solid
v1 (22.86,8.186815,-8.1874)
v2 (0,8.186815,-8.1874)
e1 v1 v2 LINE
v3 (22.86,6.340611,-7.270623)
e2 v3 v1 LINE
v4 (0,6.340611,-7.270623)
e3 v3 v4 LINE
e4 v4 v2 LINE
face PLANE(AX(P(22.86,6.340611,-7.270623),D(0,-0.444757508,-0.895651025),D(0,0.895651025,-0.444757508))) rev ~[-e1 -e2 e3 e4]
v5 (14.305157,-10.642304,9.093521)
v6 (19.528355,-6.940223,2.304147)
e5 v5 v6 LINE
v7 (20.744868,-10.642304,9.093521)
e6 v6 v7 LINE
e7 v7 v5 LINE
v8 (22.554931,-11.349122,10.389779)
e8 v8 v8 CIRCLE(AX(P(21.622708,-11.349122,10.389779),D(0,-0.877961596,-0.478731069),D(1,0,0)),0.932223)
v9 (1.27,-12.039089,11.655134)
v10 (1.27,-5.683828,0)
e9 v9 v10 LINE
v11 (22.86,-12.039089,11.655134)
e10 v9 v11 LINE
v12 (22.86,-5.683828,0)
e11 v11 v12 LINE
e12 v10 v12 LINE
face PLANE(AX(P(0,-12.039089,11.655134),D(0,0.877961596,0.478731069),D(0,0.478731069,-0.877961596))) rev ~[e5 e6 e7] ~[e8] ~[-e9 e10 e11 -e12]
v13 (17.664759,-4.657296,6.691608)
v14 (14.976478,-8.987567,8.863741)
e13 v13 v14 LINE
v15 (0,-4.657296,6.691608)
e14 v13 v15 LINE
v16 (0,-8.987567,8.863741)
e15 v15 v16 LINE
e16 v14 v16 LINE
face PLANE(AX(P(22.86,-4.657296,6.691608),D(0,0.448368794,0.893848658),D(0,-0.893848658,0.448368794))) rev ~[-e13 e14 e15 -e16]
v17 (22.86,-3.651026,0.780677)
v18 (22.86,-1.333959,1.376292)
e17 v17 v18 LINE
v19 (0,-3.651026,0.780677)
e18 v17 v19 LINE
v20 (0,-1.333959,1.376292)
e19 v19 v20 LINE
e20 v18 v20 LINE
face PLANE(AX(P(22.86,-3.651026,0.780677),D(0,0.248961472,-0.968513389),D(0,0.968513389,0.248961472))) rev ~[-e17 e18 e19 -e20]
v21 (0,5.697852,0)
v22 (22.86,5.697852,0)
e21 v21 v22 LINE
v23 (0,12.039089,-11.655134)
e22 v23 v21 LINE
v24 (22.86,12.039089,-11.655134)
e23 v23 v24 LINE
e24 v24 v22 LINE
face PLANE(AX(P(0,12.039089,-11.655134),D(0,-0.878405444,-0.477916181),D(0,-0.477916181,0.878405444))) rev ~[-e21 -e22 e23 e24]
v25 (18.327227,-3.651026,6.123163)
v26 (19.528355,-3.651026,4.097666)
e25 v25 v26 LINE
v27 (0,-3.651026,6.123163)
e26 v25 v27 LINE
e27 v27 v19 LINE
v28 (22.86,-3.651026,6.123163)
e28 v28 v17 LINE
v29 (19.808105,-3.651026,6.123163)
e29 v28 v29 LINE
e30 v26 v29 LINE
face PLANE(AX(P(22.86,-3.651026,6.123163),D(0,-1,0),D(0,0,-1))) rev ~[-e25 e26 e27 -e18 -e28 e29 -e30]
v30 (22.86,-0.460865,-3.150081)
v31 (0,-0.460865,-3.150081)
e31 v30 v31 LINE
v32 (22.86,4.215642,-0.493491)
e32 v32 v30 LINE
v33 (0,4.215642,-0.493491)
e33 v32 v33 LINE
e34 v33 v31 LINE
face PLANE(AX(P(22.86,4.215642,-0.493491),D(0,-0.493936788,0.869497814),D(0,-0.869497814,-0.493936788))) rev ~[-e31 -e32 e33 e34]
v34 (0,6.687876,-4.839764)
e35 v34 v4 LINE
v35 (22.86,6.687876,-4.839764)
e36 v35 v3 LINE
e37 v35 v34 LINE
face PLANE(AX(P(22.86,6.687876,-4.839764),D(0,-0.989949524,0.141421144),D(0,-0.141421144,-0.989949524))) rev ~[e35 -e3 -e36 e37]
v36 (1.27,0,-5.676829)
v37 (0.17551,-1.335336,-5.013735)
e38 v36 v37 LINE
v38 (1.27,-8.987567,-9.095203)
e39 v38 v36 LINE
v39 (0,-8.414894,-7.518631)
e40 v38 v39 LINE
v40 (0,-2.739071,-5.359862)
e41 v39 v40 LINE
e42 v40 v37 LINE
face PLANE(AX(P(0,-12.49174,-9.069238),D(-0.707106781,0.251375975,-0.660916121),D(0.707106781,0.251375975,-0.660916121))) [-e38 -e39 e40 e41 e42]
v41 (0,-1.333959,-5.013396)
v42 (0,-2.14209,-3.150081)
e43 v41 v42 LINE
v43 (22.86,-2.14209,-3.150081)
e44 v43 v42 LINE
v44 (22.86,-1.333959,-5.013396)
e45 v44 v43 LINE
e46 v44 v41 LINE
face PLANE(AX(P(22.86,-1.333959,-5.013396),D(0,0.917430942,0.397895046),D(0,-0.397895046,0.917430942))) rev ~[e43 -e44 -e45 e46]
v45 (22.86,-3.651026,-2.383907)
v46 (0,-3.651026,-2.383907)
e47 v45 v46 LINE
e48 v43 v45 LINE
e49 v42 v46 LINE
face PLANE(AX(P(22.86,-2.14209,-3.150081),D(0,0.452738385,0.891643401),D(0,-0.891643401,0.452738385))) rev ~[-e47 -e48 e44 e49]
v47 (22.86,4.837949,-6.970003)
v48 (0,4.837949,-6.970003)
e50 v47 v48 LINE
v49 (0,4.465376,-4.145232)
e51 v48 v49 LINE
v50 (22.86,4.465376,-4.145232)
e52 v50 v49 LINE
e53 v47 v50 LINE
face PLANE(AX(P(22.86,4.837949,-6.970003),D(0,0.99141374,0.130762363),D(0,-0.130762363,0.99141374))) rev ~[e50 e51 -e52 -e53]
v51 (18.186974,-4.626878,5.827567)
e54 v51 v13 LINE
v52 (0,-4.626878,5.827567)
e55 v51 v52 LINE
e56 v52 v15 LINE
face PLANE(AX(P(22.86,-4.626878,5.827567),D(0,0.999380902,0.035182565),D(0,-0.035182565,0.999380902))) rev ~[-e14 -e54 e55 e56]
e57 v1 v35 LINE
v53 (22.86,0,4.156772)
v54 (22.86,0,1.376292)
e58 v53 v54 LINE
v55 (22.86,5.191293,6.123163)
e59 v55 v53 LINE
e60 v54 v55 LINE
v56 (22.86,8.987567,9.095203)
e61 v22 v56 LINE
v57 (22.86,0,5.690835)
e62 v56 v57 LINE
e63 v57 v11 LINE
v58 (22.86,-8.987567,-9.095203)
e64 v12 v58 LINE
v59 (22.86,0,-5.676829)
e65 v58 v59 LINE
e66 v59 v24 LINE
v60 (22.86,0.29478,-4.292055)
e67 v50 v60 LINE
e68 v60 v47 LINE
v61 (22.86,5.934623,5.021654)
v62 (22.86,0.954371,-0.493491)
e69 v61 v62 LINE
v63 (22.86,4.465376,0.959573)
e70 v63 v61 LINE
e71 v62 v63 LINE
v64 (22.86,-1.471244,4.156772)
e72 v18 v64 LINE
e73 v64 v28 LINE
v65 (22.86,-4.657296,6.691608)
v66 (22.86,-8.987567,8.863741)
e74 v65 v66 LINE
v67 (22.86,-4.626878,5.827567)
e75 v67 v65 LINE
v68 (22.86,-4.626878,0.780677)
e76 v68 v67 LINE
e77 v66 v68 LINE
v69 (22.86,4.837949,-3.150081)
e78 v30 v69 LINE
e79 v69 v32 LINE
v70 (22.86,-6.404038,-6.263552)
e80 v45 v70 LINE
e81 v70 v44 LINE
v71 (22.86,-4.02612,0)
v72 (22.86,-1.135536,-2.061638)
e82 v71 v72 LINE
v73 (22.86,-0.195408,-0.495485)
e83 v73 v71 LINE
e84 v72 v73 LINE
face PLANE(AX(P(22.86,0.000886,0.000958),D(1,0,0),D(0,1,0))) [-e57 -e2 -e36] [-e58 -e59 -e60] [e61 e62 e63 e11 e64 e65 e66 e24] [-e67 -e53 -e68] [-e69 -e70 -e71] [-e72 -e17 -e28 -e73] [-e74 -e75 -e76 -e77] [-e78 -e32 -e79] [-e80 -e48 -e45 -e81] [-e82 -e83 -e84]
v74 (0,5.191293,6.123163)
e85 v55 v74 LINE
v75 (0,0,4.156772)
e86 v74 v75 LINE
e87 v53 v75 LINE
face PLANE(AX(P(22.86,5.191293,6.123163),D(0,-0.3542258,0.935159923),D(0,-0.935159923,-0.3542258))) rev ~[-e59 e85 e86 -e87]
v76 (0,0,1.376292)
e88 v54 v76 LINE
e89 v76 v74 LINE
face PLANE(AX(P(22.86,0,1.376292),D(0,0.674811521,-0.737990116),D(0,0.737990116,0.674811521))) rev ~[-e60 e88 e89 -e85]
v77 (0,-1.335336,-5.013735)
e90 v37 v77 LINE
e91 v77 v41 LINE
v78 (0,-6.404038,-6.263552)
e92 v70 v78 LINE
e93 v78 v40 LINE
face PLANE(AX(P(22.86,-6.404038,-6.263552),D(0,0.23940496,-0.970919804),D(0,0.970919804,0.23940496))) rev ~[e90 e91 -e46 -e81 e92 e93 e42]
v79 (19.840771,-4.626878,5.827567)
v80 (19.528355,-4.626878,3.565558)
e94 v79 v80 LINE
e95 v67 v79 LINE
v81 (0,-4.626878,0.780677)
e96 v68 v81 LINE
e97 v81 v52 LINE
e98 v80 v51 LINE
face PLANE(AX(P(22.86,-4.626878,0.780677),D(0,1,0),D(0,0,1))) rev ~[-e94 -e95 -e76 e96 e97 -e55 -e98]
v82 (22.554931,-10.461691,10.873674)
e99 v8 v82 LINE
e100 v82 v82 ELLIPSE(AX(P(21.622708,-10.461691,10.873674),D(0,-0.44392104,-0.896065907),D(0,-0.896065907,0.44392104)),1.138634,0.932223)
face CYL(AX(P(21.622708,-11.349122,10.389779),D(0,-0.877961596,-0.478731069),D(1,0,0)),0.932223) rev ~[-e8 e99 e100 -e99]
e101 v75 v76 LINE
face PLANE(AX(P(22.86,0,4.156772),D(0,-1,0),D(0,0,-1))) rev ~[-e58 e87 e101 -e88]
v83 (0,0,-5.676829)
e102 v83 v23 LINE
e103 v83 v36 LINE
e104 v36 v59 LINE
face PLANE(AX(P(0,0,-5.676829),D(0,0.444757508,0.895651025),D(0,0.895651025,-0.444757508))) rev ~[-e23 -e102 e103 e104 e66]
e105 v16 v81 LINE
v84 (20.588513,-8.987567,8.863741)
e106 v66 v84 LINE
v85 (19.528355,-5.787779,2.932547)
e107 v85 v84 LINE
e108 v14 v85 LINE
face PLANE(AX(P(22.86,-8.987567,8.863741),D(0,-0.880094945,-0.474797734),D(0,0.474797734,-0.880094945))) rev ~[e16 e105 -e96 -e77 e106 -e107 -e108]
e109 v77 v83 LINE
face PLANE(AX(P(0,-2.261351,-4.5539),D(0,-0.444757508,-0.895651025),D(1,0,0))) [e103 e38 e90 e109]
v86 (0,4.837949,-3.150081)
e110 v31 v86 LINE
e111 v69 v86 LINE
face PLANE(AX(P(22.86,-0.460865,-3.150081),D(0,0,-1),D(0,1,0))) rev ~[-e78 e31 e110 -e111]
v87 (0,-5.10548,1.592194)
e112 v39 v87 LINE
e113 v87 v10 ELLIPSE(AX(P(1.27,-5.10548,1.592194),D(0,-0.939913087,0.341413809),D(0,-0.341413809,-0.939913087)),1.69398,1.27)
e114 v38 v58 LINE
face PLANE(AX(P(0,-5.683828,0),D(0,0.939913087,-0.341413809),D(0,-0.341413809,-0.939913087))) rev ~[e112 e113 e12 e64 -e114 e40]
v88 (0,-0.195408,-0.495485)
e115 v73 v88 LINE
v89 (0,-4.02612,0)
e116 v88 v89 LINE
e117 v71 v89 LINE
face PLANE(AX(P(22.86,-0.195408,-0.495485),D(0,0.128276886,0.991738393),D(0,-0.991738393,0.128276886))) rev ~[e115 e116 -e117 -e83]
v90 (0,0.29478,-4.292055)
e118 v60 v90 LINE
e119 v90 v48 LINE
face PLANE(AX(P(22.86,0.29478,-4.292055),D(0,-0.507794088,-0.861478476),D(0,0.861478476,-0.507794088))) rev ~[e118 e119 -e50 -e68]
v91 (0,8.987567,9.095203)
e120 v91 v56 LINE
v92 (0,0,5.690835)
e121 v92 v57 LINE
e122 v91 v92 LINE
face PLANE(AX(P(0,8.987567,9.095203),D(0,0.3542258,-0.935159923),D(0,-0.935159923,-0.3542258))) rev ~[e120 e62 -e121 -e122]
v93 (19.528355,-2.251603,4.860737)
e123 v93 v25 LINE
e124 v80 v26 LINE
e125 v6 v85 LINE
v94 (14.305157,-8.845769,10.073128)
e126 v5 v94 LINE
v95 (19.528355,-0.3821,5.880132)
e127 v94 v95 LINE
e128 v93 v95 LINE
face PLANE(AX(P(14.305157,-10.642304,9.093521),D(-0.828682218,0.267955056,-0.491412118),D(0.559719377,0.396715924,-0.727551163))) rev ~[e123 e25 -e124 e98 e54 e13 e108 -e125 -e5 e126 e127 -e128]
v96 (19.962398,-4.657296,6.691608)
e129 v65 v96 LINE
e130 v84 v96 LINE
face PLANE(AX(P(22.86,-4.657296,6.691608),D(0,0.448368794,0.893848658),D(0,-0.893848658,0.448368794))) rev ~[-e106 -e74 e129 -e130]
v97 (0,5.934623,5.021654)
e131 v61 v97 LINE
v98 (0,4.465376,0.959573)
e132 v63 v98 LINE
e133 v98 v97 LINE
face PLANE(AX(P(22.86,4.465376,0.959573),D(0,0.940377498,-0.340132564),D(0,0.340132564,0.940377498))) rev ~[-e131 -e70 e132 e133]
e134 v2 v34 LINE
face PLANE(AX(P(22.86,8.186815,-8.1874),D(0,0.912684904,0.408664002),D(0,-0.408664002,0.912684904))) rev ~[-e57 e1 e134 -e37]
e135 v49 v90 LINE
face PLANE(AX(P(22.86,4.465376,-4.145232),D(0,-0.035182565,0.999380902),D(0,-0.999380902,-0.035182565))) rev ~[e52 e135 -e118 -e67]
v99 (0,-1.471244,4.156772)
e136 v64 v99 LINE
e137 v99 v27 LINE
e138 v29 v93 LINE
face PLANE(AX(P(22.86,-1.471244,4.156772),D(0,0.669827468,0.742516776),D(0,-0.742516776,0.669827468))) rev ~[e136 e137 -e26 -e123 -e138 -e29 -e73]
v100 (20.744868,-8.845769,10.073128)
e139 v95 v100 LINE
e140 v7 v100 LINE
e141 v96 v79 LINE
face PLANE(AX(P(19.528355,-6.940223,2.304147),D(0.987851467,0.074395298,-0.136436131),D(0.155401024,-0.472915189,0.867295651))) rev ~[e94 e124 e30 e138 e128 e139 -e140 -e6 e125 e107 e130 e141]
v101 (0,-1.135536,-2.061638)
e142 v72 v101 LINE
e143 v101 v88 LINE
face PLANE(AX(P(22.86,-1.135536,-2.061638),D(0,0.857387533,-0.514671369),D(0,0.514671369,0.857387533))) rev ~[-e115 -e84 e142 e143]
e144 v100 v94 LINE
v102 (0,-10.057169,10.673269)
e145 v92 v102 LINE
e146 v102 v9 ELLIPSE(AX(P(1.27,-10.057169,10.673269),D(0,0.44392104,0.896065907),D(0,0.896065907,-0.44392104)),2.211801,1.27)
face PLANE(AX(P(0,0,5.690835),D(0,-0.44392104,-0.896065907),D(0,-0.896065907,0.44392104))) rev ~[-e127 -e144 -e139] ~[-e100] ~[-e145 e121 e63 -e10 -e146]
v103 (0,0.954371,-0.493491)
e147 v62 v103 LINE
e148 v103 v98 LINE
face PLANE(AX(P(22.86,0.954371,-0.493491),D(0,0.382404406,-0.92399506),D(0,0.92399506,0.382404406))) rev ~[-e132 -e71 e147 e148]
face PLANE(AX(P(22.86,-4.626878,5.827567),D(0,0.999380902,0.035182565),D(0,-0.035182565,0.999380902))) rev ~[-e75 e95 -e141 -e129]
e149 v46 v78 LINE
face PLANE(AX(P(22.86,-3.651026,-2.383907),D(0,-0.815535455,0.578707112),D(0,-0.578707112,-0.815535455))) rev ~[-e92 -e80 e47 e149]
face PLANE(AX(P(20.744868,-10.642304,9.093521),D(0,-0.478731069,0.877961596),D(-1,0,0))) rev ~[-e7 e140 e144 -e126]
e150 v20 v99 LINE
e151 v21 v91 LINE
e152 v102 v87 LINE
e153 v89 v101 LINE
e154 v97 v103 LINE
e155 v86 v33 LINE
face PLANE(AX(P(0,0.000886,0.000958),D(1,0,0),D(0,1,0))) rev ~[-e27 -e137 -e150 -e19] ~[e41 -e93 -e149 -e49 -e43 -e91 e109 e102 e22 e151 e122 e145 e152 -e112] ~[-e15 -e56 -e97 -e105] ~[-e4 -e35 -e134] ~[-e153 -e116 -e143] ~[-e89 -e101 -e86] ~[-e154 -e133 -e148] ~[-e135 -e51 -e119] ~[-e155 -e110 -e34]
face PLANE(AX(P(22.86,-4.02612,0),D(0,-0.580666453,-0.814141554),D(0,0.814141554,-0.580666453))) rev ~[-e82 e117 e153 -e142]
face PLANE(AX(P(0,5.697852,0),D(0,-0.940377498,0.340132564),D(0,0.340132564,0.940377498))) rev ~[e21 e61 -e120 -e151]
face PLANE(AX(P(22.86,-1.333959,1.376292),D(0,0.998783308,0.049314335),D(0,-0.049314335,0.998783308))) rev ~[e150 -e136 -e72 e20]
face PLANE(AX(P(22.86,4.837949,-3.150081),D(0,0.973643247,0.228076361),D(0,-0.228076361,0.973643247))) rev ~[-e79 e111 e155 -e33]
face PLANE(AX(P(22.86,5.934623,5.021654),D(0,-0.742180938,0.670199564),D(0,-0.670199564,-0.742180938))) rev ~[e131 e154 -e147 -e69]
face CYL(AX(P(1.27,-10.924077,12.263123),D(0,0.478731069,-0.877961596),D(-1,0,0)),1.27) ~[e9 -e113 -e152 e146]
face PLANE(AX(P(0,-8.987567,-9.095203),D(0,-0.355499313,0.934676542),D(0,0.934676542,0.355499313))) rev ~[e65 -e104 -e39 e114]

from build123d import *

# Parameters (mm, degrees)
F1_DEPTH    = 22.86
F3_DEPTH    = 22.861
F5_DEPTH    = 21.1407149532
F6_R        = 0.9322227143
F7_DEPTH    = 21.1407149532
F8_R        = 1.27
F9_T4_DEPTH = 16.1477728221


# Not quite as in the source:
# - a fillet or chamfer that OpenCascade refuses, or shapes differently, is made with other operations: its cross-section is extruded or revolved along the edge and cut away or added
# - a feature names something its author has since deleted; it is built from what else it names


with BuildPart() as f1:
    # F0 (on Right) → F1 (new body)
    with BuildSketch(Plane.YZ):
        Polygon((0, 5.6908354163), (-12.0390886441, 11.6551341489), (-5.6838279371, 0), (-8.9875673875, -9.0952031314), (0, -5.6768290866), (12.0390886441, -11.6551341489), (5.6978515349, 0), (8.9875673875, 9.0952031314), align=None)
    extrude(amount=F1_DEPTH)

    # F2 (on face) → F3 (cut, through all)
    with BuildSketch(Plane.YZ.offset(22.86)):
        Polygon((0.2947798819, -4.2920547475), (4.8379492509, -6.9700027277), (4.4653764926, -4.1452315636), align=None)
        Polygon((-0.460864554, -3.1500807424), (4.8379492509, -3.1500807424), (4.2156420195, -0.4934913878), align=None)
        Polygon((-6.4040375873, -6.2635522336), (-1.3339594007, -5.0133955665), (-2.1420896955, -3.1500807424), (-3.6510264616, -2.3839071877), align=None)
        Polygon((-3.6510264616, 0.7806772021), (-1.3339594007, 1.3762915041), (-1.4712439905, 4.1567722153), (-3.6510264616, 6.1231630373), align=None)
        Polygon((-8.9875673875, 8.8637409893), (-4.6268783625, 0.7806772021), (-4.6268783625, 5.8275670744), (-4.6572963607, 6.6916077305), align=None)
        Polygon((0.9543706066, -0.4934913878), (4.4653764926, 0.9595727897), (5.9346228684, 5.0216543911), align=None)
        Polygon((0, 1.3762915041), (5.1912929219, 6.1231630373), (0, 4.1567722153), align=None)
        Polygon((-0.1954076109, -0.4954853684), (-4.0261200629, 0), (-1.1355356546, -2.0616382826), align=None)
        Polygon((8.1868149158, -8.1874002878), (6.6878763027, -4.839763511), (6.3406112604, -7.2706225328), align=None)
    extrude(amount=-F3_DEPTH, mode=Mode.SUBTRACT)

    # F4 (on face) → F5 (cut, through all)
    with BuildSketch(Plane(origin=(0, -4.381188718, -2.3889554726), x_dir=(1, 0, 0), z_dir=(0, -0.8779615957, -0.4787310691))):
        Polygon((20.7448676229, 13.0785638466), (14.3051566556, 13.0785638466), (19.5283554494, 5.3454530425), align=None)
    extrude(amount=-F5_DEPTH, mode=Mode.SUBTRACT)

    # F6 (on face) → F7 (cut, through all)
    with BuildSketch(Plane(origin=(0, -4.381188718, -2.3889554726), x_dir=(1, 0, 0), z_dir=(0, -0.8779615957, -0.4787310691))):
        with Locations((21.6227080673, 14.5550044253)):
            Circle(F6_R)
    extrude(amount=-F7_DEPTH, mode=Mode.SUBTRACT)

    # F8
    f8_edges = [f1.edges().sort_by_distance(p)[0] for p in [
        (0, -8.861458, 5.827567),
    ]]
    fillet(f8_edges, radius=F8_R)

    # F9: chamfer of 1.27 on 1 edges, made by hand


with BuildPart() as f9_tool2:
    # F9_s3 → F9_t4 (new body)
    with BuildSketch(Plane(origin=(0, -13.9265349188, -5.2968844013), x_dir=(1, 0, 0), z_dir=(0, 0.9346765421, 0.355499313))):
        Polygon((0, 4.035998981), (1.27, 5.305998981), (0, 5.305998981), align=None)
    extrude(amount=F9_T4_DEPTH)

    split(bisect_by=Plane(origin=(0, -2.2613507756, -4.553899836), x_dir=(1, 0, 0), z_dir=(0, -0.4447575076, -0.8956510255)), keep=Keep.TOP)


with BuildPart() as f1_1:
    add(f1.part)

    # F9_t1: cut F9_tool2
    add(f9_tool2.part, mode=Mode.SUBTRACT)


solid = f1_1.part
